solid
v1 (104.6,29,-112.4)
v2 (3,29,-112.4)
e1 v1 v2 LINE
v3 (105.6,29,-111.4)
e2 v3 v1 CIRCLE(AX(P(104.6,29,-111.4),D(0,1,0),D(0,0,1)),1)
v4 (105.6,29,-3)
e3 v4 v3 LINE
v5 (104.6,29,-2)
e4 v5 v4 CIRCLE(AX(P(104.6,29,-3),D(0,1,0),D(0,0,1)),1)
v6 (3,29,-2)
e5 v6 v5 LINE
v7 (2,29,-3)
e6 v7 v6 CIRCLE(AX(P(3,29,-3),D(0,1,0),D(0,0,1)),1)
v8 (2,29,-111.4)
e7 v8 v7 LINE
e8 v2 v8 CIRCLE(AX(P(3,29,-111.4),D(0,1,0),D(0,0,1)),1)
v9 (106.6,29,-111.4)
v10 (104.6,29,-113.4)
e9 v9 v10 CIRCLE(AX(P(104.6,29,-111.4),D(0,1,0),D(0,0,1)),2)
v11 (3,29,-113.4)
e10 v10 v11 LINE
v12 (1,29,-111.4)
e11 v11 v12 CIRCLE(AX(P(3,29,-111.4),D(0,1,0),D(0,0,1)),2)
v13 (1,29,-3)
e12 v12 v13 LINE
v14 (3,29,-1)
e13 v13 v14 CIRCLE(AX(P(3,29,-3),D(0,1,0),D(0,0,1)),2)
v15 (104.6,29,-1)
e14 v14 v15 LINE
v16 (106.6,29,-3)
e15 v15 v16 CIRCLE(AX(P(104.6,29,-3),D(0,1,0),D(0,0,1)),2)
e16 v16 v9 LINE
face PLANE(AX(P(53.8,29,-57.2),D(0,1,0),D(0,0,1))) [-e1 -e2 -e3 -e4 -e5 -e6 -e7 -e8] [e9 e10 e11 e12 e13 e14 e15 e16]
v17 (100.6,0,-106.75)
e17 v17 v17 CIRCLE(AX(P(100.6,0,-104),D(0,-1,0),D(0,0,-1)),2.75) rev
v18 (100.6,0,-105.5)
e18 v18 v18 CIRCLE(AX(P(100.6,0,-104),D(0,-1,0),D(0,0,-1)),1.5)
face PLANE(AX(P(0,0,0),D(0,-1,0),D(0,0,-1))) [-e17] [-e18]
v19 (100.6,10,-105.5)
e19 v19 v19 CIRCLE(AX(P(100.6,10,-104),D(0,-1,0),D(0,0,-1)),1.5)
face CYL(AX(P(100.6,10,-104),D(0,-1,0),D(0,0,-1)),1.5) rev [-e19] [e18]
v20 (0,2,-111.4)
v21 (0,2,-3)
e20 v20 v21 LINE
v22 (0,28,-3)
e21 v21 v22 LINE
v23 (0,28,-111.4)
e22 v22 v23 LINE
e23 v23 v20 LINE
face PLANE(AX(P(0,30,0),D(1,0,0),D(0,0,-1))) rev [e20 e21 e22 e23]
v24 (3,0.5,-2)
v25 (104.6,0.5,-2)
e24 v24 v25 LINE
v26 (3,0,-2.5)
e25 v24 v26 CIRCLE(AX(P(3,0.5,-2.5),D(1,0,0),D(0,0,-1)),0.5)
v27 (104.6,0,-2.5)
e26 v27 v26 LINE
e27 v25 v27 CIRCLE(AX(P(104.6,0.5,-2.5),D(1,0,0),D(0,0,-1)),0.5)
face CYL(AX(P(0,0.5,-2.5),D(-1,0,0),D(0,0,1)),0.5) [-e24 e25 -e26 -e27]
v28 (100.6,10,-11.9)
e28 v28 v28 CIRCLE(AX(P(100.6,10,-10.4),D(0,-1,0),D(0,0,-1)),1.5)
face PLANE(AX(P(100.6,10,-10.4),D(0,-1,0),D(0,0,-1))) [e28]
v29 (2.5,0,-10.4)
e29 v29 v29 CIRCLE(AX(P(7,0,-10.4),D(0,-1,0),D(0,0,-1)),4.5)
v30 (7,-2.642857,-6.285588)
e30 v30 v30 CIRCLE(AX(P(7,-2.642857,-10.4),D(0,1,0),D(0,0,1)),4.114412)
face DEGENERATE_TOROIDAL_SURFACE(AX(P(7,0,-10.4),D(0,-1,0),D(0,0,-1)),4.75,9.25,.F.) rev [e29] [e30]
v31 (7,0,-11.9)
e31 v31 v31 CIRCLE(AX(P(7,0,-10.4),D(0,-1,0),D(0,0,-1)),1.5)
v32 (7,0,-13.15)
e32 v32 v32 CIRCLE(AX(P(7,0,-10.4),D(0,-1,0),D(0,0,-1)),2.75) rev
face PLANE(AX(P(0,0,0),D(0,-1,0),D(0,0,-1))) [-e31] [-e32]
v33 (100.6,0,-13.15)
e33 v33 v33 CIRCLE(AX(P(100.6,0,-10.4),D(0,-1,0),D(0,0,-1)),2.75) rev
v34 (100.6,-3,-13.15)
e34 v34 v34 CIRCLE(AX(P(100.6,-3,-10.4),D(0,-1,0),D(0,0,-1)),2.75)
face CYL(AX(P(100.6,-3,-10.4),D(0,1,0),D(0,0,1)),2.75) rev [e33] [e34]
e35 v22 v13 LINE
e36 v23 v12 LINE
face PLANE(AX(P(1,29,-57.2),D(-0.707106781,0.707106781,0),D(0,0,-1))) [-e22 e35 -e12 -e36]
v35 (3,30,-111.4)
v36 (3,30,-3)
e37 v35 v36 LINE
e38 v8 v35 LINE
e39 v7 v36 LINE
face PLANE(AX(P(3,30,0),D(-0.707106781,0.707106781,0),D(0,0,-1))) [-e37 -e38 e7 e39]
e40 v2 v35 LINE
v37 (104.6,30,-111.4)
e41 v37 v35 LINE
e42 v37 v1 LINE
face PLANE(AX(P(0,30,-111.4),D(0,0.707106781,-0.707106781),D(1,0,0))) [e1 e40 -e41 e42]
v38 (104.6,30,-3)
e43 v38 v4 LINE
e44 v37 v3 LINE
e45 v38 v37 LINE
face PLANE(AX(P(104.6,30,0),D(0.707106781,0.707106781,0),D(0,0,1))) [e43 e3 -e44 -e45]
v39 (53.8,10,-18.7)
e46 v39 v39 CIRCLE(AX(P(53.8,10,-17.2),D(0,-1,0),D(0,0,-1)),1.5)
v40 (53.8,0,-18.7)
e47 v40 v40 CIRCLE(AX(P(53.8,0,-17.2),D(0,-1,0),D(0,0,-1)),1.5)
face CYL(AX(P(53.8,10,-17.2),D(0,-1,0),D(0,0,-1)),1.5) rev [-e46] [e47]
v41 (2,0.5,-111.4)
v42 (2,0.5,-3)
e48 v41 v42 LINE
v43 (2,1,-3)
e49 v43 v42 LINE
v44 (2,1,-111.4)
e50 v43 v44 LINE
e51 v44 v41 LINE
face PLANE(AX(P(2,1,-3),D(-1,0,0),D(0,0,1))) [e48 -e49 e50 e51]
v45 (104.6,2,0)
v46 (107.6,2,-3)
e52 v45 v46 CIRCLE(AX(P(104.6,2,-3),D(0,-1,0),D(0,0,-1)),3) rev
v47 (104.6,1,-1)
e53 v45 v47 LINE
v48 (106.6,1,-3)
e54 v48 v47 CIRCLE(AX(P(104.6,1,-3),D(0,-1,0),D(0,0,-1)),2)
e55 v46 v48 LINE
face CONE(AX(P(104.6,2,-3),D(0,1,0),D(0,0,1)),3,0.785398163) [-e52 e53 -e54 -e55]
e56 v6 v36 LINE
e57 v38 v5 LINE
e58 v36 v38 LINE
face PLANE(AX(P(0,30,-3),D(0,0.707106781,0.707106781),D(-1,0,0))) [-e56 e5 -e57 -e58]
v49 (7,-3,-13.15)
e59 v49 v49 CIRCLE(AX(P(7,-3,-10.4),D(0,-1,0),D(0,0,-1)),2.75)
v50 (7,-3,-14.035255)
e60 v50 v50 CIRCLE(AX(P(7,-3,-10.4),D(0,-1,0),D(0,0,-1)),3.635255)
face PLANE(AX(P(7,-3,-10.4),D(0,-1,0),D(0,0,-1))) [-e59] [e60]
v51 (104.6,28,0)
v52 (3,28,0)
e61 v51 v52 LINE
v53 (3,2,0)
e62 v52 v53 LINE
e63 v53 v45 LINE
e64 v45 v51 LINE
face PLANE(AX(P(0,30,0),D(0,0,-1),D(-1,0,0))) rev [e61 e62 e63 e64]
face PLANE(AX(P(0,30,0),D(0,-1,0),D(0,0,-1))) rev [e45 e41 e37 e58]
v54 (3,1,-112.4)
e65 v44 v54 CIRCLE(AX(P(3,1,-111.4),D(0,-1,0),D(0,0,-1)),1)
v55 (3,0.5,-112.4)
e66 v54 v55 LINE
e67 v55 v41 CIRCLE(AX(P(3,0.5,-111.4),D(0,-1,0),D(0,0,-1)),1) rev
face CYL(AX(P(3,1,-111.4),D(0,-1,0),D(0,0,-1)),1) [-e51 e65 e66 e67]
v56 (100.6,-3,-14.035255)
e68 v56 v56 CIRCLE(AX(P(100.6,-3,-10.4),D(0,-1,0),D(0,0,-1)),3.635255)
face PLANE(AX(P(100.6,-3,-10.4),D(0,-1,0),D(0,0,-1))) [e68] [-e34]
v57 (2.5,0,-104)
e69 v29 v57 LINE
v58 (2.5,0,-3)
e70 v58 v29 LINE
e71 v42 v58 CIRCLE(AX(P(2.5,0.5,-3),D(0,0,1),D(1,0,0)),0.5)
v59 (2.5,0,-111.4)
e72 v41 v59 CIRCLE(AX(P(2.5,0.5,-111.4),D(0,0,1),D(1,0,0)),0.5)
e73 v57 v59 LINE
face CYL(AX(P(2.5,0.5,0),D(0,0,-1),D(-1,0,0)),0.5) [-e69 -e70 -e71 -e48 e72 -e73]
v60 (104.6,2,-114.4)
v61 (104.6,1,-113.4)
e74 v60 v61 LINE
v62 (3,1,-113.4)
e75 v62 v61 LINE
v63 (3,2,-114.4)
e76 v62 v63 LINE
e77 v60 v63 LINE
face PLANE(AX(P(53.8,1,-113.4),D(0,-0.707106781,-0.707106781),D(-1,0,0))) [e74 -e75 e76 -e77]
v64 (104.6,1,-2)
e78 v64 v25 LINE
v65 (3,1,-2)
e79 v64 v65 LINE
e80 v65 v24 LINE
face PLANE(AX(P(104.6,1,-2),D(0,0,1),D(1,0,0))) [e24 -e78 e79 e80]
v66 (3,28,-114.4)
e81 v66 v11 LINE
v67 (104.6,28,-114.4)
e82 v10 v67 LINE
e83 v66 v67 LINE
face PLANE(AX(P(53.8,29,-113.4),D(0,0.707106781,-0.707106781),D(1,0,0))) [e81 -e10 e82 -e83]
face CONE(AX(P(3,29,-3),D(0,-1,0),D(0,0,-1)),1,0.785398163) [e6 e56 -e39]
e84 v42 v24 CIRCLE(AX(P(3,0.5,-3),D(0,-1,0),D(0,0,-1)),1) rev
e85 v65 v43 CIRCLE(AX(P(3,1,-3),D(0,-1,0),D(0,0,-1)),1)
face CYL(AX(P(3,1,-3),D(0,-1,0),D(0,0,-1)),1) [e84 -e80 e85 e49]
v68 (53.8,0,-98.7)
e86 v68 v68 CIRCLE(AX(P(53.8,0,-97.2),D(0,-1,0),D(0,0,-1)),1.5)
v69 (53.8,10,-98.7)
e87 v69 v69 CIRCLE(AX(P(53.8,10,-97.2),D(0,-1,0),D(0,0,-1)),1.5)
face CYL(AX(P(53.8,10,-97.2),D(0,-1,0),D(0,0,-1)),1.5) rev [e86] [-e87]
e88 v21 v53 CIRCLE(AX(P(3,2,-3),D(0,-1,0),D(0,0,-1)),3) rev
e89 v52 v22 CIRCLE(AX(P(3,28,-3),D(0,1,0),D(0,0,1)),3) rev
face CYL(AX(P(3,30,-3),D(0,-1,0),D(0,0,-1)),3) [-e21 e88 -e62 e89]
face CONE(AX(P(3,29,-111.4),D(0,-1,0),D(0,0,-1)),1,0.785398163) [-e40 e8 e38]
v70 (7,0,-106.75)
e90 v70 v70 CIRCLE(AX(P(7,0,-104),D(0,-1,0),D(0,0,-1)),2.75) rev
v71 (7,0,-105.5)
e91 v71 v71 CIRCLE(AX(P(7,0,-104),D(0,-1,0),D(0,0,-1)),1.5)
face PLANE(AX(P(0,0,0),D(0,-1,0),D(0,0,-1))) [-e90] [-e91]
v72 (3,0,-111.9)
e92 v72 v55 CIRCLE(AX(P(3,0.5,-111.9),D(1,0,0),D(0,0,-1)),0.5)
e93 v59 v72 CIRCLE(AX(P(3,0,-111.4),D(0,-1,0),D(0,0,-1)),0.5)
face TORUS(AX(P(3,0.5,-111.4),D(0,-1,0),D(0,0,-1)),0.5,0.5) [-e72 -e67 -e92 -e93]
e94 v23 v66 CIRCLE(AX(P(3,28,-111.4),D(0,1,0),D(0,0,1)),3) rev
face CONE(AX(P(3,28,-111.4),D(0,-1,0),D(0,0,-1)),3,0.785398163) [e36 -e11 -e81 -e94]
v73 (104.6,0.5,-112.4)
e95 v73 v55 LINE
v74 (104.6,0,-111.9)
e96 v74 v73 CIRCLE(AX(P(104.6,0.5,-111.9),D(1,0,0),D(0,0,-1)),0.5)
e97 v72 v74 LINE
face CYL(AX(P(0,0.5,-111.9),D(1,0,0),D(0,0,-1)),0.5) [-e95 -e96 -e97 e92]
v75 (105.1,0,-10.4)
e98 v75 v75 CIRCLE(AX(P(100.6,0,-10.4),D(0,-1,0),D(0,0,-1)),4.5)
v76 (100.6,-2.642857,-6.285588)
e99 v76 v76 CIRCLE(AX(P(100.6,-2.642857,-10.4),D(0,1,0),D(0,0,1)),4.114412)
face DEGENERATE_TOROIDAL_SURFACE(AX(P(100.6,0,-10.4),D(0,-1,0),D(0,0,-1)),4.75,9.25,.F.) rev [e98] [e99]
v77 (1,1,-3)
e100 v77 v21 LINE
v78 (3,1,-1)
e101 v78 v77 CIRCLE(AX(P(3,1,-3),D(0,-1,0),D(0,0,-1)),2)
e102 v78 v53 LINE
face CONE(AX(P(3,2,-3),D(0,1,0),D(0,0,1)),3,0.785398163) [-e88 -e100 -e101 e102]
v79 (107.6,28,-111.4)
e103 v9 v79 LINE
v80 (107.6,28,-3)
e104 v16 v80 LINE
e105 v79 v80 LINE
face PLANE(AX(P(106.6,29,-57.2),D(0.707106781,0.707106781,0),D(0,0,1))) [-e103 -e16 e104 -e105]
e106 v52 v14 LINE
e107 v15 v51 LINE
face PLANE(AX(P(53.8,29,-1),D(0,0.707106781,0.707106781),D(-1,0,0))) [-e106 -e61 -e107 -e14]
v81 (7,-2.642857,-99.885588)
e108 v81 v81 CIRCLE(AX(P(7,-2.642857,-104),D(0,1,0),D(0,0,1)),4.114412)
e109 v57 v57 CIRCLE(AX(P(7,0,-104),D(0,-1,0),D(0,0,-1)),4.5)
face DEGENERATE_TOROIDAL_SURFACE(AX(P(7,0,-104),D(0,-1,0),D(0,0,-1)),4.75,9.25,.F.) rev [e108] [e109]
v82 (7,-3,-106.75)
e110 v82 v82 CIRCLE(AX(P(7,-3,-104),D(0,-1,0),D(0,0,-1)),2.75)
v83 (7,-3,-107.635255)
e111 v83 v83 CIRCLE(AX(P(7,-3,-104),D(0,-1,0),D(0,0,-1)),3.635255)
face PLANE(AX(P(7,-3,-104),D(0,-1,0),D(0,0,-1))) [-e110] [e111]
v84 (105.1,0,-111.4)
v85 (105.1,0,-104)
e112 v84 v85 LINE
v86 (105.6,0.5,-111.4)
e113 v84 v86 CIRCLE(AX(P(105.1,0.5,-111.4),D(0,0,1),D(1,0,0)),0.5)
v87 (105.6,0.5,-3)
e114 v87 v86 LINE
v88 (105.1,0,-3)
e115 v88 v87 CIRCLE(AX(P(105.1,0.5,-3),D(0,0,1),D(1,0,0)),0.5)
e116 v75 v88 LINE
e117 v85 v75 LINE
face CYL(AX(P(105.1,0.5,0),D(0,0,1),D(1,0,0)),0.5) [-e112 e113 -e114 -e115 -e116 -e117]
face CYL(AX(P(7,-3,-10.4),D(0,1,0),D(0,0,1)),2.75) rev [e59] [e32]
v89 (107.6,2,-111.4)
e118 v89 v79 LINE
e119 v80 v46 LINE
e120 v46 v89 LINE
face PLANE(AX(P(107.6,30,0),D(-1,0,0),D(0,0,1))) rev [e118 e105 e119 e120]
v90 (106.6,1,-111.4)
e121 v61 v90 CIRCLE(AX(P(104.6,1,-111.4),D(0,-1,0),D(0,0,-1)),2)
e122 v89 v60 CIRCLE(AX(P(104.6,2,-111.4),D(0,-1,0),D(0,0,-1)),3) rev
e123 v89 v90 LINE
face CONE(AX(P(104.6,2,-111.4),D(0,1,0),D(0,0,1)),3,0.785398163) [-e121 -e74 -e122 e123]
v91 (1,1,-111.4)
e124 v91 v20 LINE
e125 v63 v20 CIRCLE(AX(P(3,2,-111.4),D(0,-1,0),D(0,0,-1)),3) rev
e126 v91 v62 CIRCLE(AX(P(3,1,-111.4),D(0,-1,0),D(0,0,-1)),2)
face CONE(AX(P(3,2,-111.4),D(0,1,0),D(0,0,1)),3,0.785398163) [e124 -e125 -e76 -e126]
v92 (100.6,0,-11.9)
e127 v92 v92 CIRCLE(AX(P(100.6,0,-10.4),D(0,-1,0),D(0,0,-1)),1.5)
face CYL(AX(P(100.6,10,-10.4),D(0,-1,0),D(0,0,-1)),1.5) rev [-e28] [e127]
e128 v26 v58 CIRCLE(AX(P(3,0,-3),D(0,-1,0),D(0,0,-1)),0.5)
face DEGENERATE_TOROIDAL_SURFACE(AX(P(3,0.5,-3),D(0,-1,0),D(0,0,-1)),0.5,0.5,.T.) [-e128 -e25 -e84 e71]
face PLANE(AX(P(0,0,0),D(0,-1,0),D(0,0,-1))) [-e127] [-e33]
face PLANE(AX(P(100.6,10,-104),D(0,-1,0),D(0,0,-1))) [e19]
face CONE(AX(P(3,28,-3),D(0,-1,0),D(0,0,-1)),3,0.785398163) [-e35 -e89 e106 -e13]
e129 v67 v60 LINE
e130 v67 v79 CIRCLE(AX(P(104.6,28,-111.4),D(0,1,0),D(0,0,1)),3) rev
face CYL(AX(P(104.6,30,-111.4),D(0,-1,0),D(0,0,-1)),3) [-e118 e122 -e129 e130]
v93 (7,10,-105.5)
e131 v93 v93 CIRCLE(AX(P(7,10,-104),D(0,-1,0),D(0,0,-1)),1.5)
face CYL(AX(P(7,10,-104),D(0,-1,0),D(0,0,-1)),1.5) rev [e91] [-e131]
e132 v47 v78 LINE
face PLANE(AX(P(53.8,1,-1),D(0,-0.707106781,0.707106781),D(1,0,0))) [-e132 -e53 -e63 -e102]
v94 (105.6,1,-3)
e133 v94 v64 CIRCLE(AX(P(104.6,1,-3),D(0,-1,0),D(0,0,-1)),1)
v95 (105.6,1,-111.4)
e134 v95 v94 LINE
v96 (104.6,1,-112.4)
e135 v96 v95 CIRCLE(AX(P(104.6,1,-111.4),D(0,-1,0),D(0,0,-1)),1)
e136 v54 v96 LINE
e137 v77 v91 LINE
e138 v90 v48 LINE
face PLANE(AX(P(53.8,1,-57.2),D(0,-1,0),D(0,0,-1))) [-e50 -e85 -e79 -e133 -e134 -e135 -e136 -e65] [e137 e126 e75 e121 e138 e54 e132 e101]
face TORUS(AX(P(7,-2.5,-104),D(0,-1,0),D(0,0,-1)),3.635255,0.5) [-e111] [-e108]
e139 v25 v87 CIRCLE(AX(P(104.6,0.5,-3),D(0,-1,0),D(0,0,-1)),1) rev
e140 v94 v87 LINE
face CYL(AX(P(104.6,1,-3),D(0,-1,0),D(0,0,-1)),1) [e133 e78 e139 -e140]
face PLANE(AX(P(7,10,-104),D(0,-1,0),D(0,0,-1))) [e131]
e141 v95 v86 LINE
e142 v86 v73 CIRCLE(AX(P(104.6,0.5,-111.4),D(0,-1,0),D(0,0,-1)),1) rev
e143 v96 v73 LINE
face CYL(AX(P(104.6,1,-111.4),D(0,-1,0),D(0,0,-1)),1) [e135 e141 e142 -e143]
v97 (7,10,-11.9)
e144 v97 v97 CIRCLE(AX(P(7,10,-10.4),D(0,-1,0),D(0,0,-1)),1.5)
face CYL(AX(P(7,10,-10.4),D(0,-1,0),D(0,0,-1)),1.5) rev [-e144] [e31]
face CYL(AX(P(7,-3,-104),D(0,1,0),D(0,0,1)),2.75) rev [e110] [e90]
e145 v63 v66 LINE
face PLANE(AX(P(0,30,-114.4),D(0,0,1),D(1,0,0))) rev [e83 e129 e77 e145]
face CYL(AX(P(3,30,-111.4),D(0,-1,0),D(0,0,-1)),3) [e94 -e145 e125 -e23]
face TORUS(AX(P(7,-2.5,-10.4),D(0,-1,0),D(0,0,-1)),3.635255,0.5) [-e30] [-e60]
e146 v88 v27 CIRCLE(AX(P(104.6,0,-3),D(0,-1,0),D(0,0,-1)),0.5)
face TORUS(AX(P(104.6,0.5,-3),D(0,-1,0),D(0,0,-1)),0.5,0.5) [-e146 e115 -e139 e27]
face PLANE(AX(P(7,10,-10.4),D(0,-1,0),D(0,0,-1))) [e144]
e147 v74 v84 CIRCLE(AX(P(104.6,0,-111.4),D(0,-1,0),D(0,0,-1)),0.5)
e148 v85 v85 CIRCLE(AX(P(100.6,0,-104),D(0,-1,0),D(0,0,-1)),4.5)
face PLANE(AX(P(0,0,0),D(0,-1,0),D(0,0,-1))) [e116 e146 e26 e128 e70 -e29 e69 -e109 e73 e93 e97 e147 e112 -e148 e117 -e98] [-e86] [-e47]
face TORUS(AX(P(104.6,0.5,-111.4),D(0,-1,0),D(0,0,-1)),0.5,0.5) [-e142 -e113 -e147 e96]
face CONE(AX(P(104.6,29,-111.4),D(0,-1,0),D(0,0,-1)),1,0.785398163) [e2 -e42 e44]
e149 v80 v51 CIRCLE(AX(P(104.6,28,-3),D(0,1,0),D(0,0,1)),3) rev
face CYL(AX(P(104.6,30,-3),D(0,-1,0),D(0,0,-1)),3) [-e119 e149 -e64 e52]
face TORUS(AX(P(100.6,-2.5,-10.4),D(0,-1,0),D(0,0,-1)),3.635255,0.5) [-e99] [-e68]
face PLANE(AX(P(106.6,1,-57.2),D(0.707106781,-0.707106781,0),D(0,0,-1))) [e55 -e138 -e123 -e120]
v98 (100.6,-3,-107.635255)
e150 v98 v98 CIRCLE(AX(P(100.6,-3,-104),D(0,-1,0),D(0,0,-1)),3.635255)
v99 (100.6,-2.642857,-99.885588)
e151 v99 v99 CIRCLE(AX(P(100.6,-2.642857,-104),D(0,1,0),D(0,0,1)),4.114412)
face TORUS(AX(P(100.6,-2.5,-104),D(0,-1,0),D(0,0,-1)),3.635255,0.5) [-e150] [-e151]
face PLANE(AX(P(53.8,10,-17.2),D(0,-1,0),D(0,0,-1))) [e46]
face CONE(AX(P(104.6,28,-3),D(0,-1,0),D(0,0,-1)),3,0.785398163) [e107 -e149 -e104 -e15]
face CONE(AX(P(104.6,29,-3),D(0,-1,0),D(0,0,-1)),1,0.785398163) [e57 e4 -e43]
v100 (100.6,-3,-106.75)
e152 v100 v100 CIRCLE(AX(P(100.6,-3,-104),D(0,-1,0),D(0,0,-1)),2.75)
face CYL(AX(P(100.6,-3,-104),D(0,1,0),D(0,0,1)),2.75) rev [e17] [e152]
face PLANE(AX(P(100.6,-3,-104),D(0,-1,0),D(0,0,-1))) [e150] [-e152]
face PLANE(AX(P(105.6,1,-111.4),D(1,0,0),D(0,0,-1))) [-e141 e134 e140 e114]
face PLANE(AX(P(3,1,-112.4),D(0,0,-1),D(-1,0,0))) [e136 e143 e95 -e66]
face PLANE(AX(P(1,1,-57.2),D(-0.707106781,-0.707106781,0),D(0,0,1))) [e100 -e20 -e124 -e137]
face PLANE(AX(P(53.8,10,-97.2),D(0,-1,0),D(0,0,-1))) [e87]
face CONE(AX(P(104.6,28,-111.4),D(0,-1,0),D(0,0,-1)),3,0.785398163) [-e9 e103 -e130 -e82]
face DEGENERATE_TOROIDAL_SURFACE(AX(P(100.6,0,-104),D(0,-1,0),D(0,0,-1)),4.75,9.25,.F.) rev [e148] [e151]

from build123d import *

# Parameters (mm, degrees)
SKETCH1_W                    = 107.6
SKETCH1_H                    = 114.4
BOSS_EXTRUDE1_DEPTH          = 30
SKETCH2_R                    = 1.5
CUT_EXTRUDE1_DEPTH           = 10
SKETCH3_R                    = 4.5
SKETCH3_R_2                  = 2.75
BOSS_EXTRUDE2_DEPTH          = 3
FILLET5_R                    = 0.5
FILLET5_OF_SKETCH_PATTERN1_R = 0.5
FILLET2_R                    = 3
SKETCH6_OUTSIDE_W            = 141.696
SKETCH6_OUTSIDE_H            = 148.496
CUT_EXTRUDE2_DEPTH           = 1
SKETCH7_OUTSIDE_W            = 141.696
SKETCH7_OUTSIDE_H            = 148.496
CUT_EXTRUDE3_DEPTH           = 1
CHAMFER1_SIZE                = 1
CHAMFER2_SIZE                = 1
FILLET4_R                    = 0.5


with BuildPart() as part:
    # Sketch1 → Boss-Extrude1 (new body)
    with BuildSketch(Plane(origin=(0, 0, 0), x_dir=(1, 0, 0), z_dir=(0, 1, 0))):
        with Locations((53.8, 57.2)):
            Rectangle(SKETCH1_W, SKETCH1_H)
    extrude(amount=BOSS_EXTRUDE1_DEPTH)

    # Sketch2 → Cut-Extrude1 (cut)
    with BuildSketch(Plane.XZ):
        with Locations(Location((7, -104, 0), (0, 0, 270))):
            Circle(SKETCH2_R)
        with Locations(Location((100.6, -104, 0), (0, 0, 270))):
            Circle(SKETCH2_R)
        with Locations(Location((100.6, -10.4, 0), (0, 0, 270))):
            Circle(SKETCH2_R)
        with Locations(Location((7, -10.4, 0), (0, 0, 270))):
            Circle(SKETCH2_R)
        with Locations(Location((53.8, -17.2, 0), (0, 0, 270))):
            Circle(SKETCH2_R)
        with Locations(Location((53.8, -97.2, 0), (0, 0, 270))):
            Circle(SKETCH2_R)
    extrude(amount=-CUT_EXTRUDE1_DEPTH, mode=Mode.SUBTRACT)

    # Sketch3 → Boss-Extrude2 (add)
    with BuildSketch(Plane.XZ):
        with Locations(Location((7, -104, 0), (0, 0, 270))):
            Circle(SKETCH3_R)
        with Locations(Location((7, -104, 0), (0, 0, 270))):
            Circle(SKETCH3_R_2, mode=Mode.SUBTRACT)
    boss_extrude2 = extrude(amount=BOSS_EXTRUDE2_DEPTH)

    # Sketch8 → Cut-Revolve1 (revolve, cut)
    with BuildSketch(Plane(origin=(7, 0, 0), x_dir=(0, 0, -1), z_dir=(1, 0, 0))):
        with BuildLine():
            Line((108.5, 0), (108.5, -3))
            Line((108.5, -3), (108, -3))
            ThreePointArc((108, -3), (108.374143795, -1.520690633), (108.5, 0))
        make_face()
    cut_revolve1 = revolve(axis=Axis((7, -3, -104), (0, 1, 0)), mode=Mode.SUBTRACT)

    # Fillet5
    fillet5_edges = [part.edges().sort_by_distance(p)[0] for p in [
        (7, -3, -100),
    ]]
    fillet(fillet5_edges, radius=FILLET5_R)

    # Sketch-Pattern1: Boss-Extrude2, Cut-Revolve1 at 3 more places
    with Locations((0, 0, 93.6), (93.6, 0, 93.6), (93.6, 0, 0)):
        add(boss_extrude2)
        add(cut_revolve1, mode=Mode.SUBTRACT)

    # Fillet5 of Sketch-Pattern1
    fillet5_of_sketch_pattern1_edges = [part.edges().sort_by_distance(p)[0] for p in [
        (7, -3, -6.4),
        (100.6, -3, -6.4),
        (100.6, -3, -100),
    ]]
    fillet(fillet5_of_sketch_pattern1_edges, radius=FILLET5_OF_SKETCH_PATTERN1_R)

    # Fillet2
    fillet2_edges = [part.edges().sort_by_distance(p)[0] for p in [
        (0, 15, -114.4),
        (107.6, 15, -114.4),
        (107.6, 15, 0),
        (0, 15, 0),
    ]]
    fillet(fillet2_edges, radius=FILLET2_R)

    # Sketch6 outside → Cut-Extrude2 (cut)
    with BuildSketch(Plane(origin=(0, 30, 0), x_dir=(1, 0, 0), z_dir=(0, 1, 0))):
        with Locations((53.8, 57.2)):
            Rectangle(SKETCH6_OUTSIDE_W, SKETCH6_OUTSIDE_H)
        with BuildLine():
            Line((2, 111.4), (2, 3))
            ThreePointArc((2, 3), (2.292893219, 2.292893219), (3, 2))
            Line((3, 2), (104.6, 2))
            ThreePointArc((104.6, 2), (105.307106781, 2.292893219), (105.6, 3))
            Line((105.6, 3), (105.6, 111.4))
            ThreePointArc((105.6, 111.4), (105.307106781, 112.107106781), (104.6, 112.4))
            Line((104.6, 112.4), (3, 112.4))
            ThreePointArc((3, 112.4), (2.292893219, 112.107106781), (2, 111.4))
        make_face(mode=Mode.SUBTRACT)
    extrude(amount=-CUT_EXTRUDE2_DEPTH, mode=Mode.SUBTRACT)

    # Sketch7 outside → Cut-Extrude3 (cut)
    with BuildSketch(Plane.XZ):
        with Locations((53.8, -57.2)):
            Rectangle(SKETCH7_OUTSIDE_W, SKETCH7_OUTSIDE_H)
        with BuildLine():
            Line((105.6, -111.4), (105.6, -3))
            ThreePointArc((105.6, -3), (105.307106781, -2.292893219), (104.6, -2))
            Line((104.6, -2), (3, -2))
            ThreePointArc((3, -2), (2.292893219, -2.292893219), (2, -3))
            Line((2, -3), (2, -111.4))
            ThreePointArc((2, -111.4), (2.292893219, -112.107106781), (3, -112.4))
            Line((3, -112.4), (104.6, -112.4))
            ThreePointArc((104.6, -112.4), (105.307106781, -112.107106781), (105.6, -111.4))
        make_face(mode=Mode.SUBTRACT)
    extrude(amount=-CUT_EXTRUDE3_DEPTH, mode=Mode.SUBTRACT)

    # Chamfer1
    chamfer1_edges = [part.edges().sort_by_distance(p)[0] for p in [
        (0.878679656, 29, -0.878679656),
        (53.8, 29, -114.4),
        (0, 29, -57.2),
        (53.8, 29, 0),
        (107.6, 29, -57.2),
        (106.721320344, 29, -113.521320344),
        (106.721320344, 29, -0.878679656),
        (0.878679656, 29, -113.521320344),
        (0.878679656, 1, -0.878679656),
        (107.6, 1, -57.2),
        (53.8, 1, 0),
        (0, 1, -57.2),
        (53.8, 1, -114.4),
        (106.721320344, 1, -113.521320344),
        (0.878679656, 1, -113.521320344),
        (106.721320344, 1, -0.878679656),
    ]]
    chamfer(chamfer1_edges, length=CHAMFER1_SIZE)

    # Chamfer2
    chamfer2_edges = [part.edges().sort_by_distance(p)[0] for p in [
        (53.8, 30, -112.4),
        (2.292893219, 30, -112.107106781),
        (105.307106781, 30, -112.107106781),
        (2, 30, -57.2),
        (105.6, 30, -57.2),
        (2.292893219, 30, -2.292893219),
        (105.307106781, 30, -2.292893219),
        (53.8, 30, -2),
    ]]
    chamfer(chamfer2_edges, length=CHAMFER2_SIZE - 0.0001)  # a hair under: the kernel refuses the full size

    # Fillet4
    fillet4_edges = [part.edges().sort_by_distance(p)[0] for p in [
        (105.307106781, 0, -2.292893219),
        (105.6, 0, -57.2),
        (105.307106781, 0, -112.107106781),
        (53.8, 0, -112.4),
        (2.292893219, 0, -112.107106781),
        (2, 0, -57.2),
        (2.292893219, 0, -2.292893219),
        (53.8, 0, -2),
    ]]
    fillet(fillet4_edges, radius=FILLET4_R - 0.0001)  # a hair under: the kernel refuses the full size


solid = part.part
